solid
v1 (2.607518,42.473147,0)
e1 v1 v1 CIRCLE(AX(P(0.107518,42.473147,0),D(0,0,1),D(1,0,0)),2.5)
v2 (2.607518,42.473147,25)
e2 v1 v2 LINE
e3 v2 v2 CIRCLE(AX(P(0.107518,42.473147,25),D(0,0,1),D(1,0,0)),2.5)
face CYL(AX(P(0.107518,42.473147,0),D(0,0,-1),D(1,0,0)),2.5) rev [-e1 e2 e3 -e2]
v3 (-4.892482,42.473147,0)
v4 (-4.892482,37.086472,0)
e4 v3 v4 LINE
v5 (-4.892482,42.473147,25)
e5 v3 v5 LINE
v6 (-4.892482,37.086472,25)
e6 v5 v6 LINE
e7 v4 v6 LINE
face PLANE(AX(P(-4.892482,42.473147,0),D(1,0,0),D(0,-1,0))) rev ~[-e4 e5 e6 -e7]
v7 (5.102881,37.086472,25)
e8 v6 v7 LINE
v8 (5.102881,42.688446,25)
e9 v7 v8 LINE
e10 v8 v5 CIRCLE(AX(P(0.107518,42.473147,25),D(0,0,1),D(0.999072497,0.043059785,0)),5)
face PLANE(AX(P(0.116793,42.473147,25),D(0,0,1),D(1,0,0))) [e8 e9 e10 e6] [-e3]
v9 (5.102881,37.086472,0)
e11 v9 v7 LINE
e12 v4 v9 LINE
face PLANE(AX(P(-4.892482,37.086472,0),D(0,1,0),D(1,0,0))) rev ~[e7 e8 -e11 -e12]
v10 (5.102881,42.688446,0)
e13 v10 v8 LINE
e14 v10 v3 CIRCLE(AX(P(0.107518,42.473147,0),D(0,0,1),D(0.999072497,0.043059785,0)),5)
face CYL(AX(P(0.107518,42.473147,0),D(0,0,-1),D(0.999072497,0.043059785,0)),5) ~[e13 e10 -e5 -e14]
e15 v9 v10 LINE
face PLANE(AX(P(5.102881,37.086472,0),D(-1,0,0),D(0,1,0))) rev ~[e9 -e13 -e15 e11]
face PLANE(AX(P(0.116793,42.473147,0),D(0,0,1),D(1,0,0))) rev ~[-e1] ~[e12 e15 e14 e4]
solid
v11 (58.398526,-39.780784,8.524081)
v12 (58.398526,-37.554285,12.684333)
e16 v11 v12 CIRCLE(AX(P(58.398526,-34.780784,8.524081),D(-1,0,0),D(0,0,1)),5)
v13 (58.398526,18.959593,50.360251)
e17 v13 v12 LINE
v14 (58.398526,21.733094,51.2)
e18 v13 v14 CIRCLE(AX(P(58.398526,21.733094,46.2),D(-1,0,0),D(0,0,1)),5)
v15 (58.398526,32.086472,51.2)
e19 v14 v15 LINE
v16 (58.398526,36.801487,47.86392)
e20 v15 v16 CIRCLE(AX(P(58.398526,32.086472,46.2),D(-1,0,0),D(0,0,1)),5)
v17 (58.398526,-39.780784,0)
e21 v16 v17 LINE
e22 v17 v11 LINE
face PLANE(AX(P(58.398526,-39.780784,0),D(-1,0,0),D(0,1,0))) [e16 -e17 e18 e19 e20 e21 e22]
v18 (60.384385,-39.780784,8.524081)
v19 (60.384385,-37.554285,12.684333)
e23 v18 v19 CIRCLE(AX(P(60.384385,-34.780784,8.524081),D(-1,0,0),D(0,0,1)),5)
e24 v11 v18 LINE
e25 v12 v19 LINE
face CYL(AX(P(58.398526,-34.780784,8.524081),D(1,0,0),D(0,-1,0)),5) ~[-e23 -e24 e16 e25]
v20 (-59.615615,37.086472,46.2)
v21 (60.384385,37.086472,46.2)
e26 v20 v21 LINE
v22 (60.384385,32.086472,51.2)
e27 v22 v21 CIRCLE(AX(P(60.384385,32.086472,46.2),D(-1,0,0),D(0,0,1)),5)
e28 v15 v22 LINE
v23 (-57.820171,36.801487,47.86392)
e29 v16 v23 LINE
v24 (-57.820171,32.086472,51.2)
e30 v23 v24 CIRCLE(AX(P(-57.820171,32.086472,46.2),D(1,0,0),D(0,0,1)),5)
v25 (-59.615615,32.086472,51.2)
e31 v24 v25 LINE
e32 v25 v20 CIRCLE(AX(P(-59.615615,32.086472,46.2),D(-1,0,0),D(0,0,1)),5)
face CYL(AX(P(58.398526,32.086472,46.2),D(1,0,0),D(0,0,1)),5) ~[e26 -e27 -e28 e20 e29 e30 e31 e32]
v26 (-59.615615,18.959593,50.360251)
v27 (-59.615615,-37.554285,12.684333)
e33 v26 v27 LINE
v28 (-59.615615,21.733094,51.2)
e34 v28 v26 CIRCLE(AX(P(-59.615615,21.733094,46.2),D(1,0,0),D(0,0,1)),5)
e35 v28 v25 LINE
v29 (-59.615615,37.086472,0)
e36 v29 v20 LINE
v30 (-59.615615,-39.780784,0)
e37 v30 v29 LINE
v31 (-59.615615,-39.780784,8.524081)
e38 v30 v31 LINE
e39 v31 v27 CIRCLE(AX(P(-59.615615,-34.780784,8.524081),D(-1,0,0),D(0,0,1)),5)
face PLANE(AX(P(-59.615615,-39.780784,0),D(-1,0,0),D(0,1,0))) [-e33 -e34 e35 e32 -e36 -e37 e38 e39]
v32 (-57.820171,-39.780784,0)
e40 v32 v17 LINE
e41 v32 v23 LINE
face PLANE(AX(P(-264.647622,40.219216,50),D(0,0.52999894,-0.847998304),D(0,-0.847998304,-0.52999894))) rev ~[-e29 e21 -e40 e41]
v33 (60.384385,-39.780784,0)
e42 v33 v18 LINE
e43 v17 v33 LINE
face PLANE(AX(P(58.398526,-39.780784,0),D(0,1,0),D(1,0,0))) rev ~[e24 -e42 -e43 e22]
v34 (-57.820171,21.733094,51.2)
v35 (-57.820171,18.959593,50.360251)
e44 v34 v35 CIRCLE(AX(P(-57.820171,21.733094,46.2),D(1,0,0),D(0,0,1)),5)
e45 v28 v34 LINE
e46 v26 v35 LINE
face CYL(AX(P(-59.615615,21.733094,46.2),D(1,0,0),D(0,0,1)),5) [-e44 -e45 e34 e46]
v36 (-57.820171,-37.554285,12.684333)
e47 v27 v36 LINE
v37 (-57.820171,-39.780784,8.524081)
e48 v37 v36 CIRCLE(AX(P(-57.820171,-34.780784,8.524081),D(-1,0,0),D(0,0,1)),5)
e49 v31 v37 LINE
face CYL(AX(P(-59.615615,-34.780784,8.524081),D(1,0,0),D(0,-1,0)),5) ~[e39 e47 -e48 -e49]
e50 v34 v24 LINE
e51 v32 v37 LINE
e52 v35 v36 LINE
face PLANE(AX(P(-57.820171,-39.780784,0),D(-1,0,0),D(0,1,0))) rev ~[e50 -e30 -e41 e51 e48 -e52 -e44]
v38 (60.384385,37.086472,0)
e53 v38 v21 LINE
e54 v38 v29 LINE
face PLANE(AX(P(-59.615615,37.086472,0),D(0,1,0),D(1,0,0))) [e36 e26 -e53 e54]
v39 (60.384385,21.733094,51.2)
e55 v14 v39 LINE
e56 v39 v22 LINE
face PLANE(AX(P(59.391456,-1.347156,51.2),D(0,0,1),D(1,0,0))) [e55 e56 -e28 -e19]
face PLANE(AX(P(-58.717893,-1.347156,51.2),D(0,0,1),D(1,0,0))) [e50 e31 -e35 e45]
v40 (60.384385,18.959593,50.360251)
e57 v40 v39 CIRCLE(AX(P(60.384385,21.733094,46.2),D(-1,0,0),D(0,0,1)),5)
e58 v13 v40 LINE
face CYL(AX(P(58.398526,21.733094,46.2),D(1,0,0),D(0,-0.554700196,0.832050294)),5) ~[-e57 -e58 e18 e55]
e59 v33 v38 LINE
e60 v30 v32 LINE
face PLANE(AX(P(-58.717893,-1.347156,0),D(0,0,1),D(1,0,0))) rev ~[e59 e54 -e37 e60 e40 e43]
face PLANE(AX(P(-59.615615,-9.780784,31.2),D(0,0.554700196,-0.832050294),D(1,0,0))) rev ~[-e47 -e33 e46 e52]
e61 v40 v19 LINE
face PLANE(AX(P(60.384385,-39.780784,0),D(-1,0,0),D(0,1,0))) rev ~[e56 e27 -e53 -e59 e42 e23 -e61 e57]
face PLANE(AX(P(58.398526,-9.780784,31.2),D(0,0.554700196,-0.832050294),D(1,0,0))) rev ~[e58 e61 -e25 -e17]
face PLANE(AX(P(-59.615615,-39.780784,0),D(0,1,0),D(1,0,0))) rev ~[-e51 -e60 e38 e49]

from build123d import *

# Parameters (mm, degrees)
F1_DEPTH    = 50
F2_T1_DEPTH = 529.8735996938
F0_R        = 2.5
F3_DEPTH    = 25
F0_W        = 1.7954435945
F0_H        = 76.8672563136
F0_W_2      = 1.9858591259
F4_DEPTH    = 51.2
F5_SIZE2    = 40
F5_SIZE     = 60
F5_2_SIZE2  = 40
F5_2_SIZE   = 60
F6_R        = 5


# Not quite as in the source:
# - a fillet or chamfer that OpenCascade refuses, or shapes differently, is made with other operations: its cross-section is extruded or revolved along the edge and cut away or added


with BuildPart() as f1:
    # F0 (on Top) → F1 (new body)
    with BuildSketch(Plane.XY):
        Polygon((-4.8924816283, 37.0864719152), (-57.8201711178, 37.0864719152), (-57.8201711178, -39.7807843983), (58.3985261619, -39.7807843983), (58.3985261619, 37.0864719152), (5.1028808584, 37.0864719152), align=None)
    extrude(amount=F1_DEPTH)

    # F2: chamfer of 80 x 50 on 1 edges, made by hand

    # F2_s2 → F2_t1 (cut)
    with BuildSketch(Plane.YZ.offset(-264.6476223249)):
        Polygon((40.2192156017, 50), (-39.7807843983, 0), (-39.7807843983, 50), align=None)
    extrude(amount=F2_T1_DEPTH, mode=Mode.SUBTRACT)

    # F0 (on Top) → F4 (join)
    with BuildSketch(Plane.XY):
        with Locations((-58.717892915, -1.3471562415)):
            Rectangle(F0_W, F0_H)
        with Locations((59.3914557248, -1.3471562415)):
            Rectangle(F0_W_2, F0_H)
    extrude(amount=F4_DEPTH)

    # F5
    f5_edges = [f1.edges().sort_by_distance(p)[0] for p in [
        (-58.717893, -39.780784, 51.2),
    ]]
    f5_side = f1.faces().sort_by_distance((-58.717893, -1.347156, 51.2))[0]
    chamfer(f5_edges, length=F5_SIZE, length2=F5_SIZE2, reference=f5_side)

    # F5#2
    f5_2_edges = [f1.edges().sort_by_distance(p)[0] for p in [
        (59.391456, -39.780784, 51.2),
    ]]
    f5_2_side = f1.faces().sort_by_distance((59.391456, -1.347156, 51.2))[0]
    chamfer(f5_2_edges, length=F5_2_SIZE, length2=F5_2_SIZE2, reference=f5_2_side)

    # F6
    f6_edges = [f1.edges().sort_by_distance(p)[0] for p in [
        (59.391456, 37.086472, 51.2),
        (59.391456, 20.219216, 51.2),
        (-58.717893, 20.219216, 51.2),
        (59.391456, -39.780784, 11.2),
        (-58.717893, -39.780784, 11.2),
    ]]
    fillet(f6_edges, radius=F6_R)


with BuildPart() as f3:
    # F0 (on Top) → F3 (new body)
    with BuildSketch(Plane.XY):
        with BuildLine():
            ThreePointArc((5.1028808584, 42.6884462108), (-0.0001560601, 47.4719877743), (-4.8924816283, 42.4731472871))
            ThreePointArc((-4.8924816283, 42.4731472871), (-0.0001560601, 37.4743067999), (5.1028808584, 42.2578483634))
            Line((5.1028808584, 42.2578483634), (5.1028808584, 42.6884462108))
        make_face()
        with Locations((0.1075183717, 42.4731472871)):
            Circle(F0_R, mode=Mode.SUBTRACT)
        with BuildLine():
            Line((-4.8924816283, 42.4731472871), (-4.8924816283, 37.0864719152))
            Line((-4.8924816283, 37.0864719152), (5.1028808584, 37.0864719152))
            Line((5.1028808584, 37.0864719152), (5.1028808584, 42.2578483634))
            ThreePointArc((5.1028808584, 42.2578483634), (-0.0001560601, 37.4743067999), (-4.8924816283, 42.4731472871))
        make_face()
    extrude(amount=F3_DEPTH)


solid = Compound([f1.part, f3.part])
